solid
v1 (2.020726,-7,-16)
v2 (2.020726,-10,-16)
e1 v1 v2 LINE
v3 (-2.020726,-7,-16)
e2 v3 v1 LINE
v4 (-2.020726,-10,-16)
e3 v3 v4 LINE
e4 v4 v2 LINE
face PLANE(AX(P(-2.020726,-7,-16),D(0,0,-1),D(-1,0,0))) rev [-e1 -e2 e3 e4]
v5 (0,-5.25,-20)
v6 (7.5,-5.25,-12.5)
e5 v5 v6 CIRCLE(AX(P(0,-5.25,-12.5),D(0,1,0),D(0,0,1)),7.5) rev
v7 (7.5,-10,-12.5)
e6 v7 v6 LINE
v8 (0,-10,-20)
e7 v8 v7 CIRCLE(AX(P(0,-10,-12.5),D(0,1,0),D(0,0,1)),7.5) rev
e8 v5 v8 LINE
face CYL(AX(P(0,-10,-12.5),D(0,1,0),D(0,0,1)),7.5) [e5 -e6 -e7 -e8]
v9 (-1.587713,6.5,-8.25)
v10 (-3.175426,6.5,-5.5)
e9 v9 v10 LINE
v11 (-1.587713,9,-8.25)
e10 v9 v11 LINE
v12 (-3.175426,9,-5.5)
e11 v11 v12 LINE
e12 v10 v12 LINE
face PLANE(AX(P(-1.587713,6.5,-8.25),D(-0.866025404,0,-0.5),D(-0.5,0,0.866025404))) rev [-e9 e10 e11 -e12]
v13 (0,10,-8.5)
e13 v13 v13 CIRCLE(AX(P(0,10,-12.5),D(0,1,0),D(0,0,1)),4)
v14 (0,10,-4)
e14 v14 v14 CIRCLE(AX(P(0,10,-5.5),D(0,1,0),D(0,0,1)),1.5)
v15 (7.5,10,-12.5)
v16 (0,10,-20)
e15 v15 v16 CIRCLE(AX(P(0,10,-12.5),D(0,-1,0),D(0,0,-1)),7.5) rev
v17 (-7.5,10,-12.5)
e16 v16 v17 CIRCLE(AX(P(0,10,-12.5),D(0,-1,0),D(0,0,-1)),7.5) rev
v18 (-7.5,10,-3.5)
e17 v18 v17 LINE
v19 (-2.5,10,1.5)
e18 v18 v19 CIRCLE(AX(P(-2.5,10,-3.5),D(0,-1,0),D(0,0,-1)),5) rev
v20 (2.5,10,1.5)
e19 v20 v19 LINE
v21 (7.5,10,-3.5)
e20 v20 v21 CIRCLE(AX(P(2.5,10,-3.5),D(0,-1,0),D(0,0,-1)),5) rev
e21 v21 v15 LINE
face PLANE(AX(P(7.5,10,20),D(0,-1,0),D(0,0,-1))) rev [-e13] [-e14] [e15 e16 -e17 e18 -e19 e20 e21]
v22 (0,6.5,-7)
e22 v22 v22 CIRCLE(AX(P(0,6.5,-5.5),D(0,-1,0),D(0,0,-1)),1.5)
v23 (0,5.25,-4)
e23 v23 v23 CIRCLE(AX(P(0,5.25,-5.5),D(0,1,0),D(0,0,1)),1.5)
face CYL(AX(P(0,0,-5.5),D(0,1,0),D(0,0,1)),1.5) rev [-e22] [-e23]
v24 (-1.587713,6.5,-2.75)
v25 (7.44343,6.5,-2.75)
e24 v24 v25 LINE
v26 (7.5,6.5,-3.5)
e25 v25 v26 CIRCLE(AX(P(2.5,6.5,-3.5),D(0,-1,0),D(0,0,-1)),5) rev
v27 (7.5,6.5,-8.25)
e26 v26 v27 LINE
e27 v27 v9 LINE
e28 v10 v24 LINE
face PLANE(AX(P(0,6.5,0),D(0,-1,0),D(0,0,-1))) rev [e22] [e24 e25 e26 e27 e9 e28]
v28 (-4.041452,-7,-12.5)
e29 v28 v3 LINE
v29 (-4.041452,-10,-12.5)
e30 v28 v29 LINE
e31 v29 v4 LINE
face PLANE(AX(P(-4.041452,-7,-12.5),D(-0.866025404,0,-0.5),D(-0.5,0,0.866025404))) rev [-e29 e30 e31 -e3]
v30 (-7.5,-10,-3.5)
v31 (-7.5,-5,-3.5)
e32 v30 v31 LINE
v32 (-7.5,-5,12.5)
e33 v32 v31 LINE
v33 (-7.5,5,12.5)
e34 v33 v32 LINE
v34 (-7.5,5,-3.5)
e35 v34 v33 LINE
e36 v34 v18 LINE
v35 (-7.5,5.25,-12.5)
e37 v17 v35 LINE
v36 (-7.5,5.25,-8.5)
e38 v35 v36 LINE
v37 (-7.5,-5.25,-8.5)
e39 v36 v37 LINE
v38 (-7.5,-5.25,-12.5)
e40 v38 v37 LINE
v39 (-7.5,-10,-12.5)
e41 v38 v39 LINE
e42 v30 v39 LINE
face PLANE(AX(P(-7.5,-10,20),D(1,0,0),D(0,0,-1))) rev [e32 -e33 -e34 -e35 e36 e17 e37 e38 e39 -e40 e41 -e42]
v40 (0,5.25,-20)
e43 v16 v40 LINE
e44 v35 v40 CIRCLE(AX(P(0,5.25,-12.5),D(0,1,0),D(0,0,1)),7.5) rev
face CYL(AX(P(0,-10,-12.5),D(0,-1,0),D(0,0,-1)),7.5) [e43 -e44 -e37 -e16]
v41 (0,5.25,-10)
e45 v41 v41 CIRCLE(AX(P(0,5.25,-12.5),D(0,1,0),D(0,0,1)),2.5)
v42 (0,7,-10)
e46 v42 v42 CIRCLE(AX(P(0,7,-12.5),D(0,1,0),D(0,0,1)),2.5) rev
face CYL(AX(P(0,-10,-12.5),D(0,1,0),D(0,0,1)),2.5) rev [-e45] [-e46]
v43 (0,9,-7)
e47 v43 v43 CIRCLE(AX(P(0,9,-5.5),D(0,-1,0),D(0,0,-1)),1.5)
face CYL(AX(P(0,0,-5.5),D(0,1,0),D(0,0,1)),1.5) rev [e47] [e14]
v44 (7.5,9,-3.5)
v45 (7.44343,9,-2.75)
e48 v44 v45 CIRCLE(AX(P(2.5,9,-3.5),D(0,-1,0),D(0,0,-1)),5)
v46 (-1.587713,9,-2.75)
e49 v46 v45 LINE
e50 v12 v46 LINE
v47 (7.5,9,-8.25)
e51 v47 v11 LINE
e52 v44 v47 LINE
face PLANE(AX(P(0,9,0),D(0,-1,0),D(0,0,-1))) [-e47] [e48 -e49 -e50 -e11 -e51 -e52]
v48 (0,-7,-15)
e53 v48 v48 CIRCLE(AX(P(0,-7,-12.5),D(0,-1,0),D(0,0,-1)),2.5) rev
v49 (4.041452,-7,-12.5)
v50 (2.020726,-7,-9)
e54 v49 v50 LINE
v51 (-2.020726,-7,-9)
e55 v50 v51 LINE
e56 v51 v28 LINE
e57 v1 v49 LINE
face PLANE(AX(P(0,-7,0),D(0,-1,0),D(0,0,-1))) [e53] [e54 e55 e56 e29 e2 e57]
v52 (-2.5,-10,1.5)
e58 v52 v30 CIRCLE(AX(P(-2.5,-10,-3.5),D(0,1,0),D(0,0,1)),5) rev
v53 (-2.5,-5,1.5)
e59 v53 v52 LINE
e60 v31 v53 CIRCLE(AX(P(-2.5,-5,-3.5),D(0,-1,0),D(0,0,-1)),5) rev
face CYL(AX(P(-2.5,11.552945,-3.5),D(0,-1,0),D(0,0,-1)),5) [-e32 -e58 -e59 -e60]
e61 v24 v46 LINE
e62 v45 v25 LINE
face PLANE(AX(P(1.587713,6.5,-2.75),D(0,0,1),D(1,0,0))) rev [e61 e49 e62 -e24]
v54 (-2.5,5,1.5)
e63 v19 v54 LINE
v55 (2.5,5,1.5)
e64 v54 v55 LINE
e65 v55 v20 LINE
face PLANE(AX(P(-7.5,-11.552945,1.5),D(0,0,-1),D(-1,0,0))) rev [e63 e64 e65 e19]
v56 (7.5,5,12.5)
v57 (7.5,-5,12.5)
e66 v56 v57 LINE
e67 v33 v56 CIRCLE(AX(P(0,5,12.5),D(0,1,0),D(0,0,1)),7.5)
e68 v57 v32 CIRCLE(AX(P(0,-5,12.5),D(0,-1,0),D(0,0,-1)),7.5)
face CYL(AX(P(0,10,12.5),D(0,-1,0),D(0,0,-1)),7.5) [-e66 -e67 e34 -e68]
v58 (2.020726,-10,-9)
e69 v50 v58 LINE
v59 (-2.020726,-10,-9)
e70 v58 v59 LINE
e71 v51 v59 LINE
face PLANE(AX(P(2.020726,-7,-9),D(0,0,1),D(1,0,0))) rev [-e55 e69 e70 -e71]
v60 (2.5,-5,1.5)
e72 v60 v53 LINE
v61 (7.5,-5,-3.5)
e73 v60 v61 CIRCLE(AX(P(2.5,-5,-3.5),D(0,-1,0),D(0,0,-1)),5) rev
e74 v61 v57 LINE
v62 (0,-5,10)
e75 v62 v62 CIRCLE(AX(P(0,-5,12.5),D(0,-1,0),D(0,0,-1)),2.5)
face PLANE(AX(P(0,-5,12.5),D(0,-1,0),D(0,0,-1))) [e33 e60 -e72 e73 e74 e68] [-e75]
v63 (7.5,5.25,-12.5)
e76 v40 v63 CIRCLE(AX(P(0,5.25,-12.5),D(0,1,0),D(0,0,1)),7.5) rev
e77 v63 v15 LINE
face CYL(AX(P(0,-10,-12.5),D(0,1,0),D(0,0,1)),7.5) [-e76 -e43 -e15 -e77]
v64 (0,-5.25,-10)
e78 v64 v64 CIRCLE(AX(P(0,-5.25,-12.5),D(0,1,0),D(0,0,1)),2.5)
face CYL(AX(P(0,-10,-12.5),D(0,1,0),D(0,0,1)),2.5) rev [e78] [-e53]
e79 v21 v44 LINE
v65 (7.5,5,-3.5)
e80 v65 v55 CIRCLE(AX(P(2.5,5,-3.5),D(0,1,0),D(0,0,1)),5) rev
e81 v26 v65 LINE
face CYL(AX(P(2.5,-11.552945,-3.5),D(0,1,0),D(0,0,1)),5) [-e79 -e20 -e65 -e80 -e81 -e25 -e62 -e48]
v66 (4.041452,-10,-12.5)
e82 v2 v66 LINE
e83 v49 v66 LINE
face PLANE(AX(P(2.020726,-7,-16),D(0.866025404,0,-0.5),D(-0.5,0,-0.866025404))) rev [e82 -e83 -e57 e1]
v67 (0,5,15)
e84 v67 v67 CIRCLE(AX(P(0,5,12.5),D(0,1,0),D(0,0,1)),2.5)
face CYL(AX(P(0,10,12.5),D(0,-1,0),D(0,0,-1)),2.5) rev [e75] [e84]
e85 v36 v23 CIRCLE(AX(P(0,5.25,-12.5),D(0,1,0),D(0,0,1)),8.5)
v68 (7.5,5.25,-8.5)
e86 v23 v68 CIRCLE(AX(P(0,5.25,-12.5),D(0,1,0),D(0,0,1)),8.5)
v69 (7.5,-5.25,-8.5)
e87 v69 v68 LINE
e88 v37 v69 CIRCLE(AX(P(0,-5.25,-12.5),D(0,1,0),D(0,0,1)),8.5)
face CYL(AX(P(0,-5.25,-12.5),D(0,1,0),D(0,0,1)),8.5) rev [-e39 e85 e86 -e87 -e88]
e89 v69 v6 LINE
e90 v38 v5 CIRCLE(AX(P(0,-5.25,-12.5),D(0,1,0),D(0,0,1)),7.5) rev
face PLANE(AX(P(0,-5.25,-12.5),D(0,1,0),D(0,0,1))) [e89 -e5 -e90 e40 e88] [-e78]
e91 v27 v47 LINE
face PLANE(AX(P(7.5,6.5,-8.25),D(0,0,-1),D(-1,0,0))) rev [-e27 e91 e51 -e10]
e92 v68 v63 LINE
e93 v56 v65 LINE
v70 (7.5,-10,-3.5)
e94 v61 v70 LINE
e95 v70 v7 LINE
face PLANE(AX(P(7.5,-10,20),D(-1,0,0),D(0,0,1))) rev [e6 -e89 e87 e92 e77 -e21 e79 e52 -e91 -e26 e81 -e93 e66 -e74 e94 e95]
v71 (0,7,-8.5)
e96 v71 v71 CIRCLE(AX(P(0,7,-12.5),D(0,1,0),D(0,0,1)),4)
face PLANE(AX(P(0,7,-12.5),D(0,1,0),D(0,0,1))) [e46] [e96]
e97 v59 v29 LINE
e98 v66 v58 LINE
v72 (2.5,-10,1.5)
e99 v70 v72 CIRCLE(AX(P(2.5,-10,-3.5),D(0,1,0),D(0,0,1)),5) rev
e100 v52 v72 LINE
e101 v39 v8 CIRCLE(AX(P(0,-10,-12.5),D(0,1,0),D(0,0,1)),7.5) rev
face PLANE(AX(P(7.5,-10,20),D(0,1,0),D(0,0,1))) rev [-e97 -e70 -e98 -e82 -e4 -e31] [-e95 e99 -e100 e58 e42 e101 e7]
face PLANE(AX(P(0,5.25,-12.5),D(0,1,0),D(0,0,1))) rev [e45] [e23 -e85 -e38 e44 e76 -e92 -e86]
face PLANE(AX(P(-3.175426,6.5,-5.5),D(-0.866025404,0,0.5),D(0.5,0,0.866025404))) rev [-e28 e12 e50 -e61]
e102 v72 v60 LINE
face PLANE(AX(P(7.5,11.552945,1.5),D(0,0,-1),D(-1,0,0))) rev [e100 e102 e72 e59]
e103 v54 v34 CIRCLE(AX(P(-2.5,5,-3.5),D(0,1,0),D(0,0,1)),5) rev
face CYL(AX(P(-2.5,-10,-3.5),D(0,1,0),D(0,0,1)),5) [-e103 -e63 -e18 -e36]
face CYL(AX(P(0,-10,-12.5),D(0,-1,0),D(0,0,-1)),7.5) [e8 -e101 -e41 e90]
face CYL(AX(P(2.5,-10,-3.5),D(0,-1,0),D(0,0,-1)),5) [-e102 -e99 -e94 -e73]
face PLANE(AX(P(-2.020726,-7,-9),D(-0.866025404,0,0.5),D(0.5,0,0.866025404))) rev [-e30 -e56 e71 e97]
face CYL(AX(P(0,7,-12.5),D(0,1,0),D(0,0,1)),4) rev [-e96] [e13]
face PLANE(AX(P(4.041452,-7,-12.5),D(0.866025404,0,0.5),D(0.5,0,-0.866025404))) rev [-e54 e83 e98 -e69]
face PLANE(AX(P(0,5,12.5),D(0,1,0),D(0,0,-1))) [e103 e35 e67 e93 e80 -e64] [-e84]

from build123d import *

# Parameters (mm, degrees)
SKETCH1_W           = 15
SKETCH1_H           = 20
BOSS_EXTRUDE1_DEPTH = 20
FILLET1_R           = 7.5
CUT_EXTRUDE1_START  = -4.75
SKETCH3_R           = 8.5
CUT_EXTRUDE1_DEPTH  = 10.5
SKETCH4_R           = 2.5
CUT_EXTRUDE2_DEPTH  = 30.261749777
CUT_EXTRUDE3_DEPTH  = 3
SKETCH6_R           = 4
CUT_EXTRUDE4_DEPTH  = 3
CUT_EXTRUDE5_DEPTH  = 30.261749777
SKETCH8_R           = 8.5
CUT_EXTRUDE6_DEPTH  = 5
SKETCH9_R           = 2.5
CUT_EXTRUDE7_DEPTH  = 27.100766272
CUT_EXTRUDE8_START  = -1
CUT_EXTRUDE8_DEPTH  = 2.5
SKETCH11_R          = 1.5
CUT_EXTRUDE9_DEPTH  = 10
SKETCH12_W          = 15
SKETCH12_H          = 7
CUT_EXTRUDE10_DEPTH = 5
SKETCH13_W          = 15
SKETCH13_H          = 7
CUT_EXTRUDE11_DEPTH = 5
FILLET2_R           = 5


# Some blends are built 0.0001 mm under size
with BuildPart() as part:
    # Sketch1 → Boss-Extrude1 (new, symmetric)
    with BuildSketch(Plane.XY):
        Rectangle(SKETCH1_W, SKETCH1_H)
    extrude(amount=BOSS_EXTRUDE1_DEPTH, both=True)

    # Fillet1
    fillet1_edges = [part.edges().sort_by_distance(p)[0] for p in [
        (-7.5, 0, -20),
        (7.5, 0, -20),
    ]]
    fillet(fillet1_edges, radius=FILLET1_R - 0.0001)  # a hair under: the kernel refuses the full size

    # Sketch3 → Cut-Extrude1 (cut)
    with BuildSketch(Plane(origin=(0, 10, 0), x_dir=(1, 0, 0), z_dir=(0, 1, 0)).offset(CUT_EXTRUDE1_START)):
        with Locations((0, 12.5)):
            Circle(SKETCH3_R)
    extrude(amount=-CUT_EXTRUDE1_DEPTH, mode=Mode.SUBTRACT)

    # Sketch4 → Cut-Extrude2 (cut, through all)
    with BuildSketch(Plane(origin=(0, 10, 0), x_dir=(1, 0, 0), z_dir=(0, 1, 0))):
        with Locations(Location((0, 12.5, 0), (0, 0, 270))):
            Circle(SKETCH4_R)
    extrude(amount=-CUT_EXTRUDE2_DEPTH, mode=Mode.SUBTRACT)

    # Sketch5 → Cut-Extrude3 (cut)
    with BuildSketch(Plane(origin=(0, -10, 0), x_dir=(-1, 0, 0), z_dir=(0, -1, 0))):
        Polygon((-2.020725942, 16), (-4.041451884, 12.5), (-2.020725942, 9), (2.020725942, 9), (4.041451884, 12.5), (2.020725942, 16), align=None)
    extrude(amount=-CUT_EXTRUDE3_DEPTH, mode=Mode.SUBTRACT)

    # Sketch6 → Cut-Extrude4 (cut)
    with BuildSketch(Plane(origin=(0, 10, 0), x_dir=(1, 0, 0), z_dir=(0, 1, 0))):
        with Locations(Location((0, 12.5, 0), (0, 0, 270))):
            Circle(SKETCH6_R)
    extrude(amount=-CUT_EXTRUDE4_DEPTH, mode=Mode.SUBTRACT)

    # Sketch7 → Cut-Extrude5 (cut, through all)
    with BuildSketch(Plane.XZ.offset(10)):
        with BuildLine():
            Line((-7.5, 12.5), (-7.5, 22.5))
            Line((-7.5, 22.5), (7.5, 22.5))
            Line((7.5, 22.5), (7.5, 12.5))
            ThreePointArc((7.5, 12.5), (0, 20), (-7.5, 12.5))
        make_face()
    extrude(amount=-CUT_EXTRUDE5_DEPTH, mode=Mode.SUBTRACT)

    # Sketch8 → Cut-Extrude6 (cut)
    with BuildSketch(Plane.XZ.offset(10)):
        with Locations((0, 12.5)):
            Circle(SKETCH8_R)
    cut_extrude6 = extrude(amount=-CUT_EXTRUDE6_DEPTH, mode=Mode.SUBTRACT)

    # Mirror3: Cut-Extrude6 across plane
    add(cut_extrude6.mirror(Plane.ZX), mode=Mode.SUBTRACT)

    # Sketch9 → Cut-Extrude7 (cut, through all)
    with BuildSketch(Plane.XZ.offset(5)):
        with Locations(Location((0, 12.5, 0), (0, 0, 270))):
            Circle(SKETCH9_R)
    extrude(amount=-CUT_EXTRUDE7_DEPTH, mode=Mode.SUBTRACT)

    # Sketch10 → Cut-Extrude8 (cut)
    with BuildSketch(Plane(origin=(0, 10, 0), x_dir=(1, 0, 0), z_dir=(0, 1, 0)).offset(CUT_EXTRUDE8_START)):
        Polygon((1.58771324, 2.75), (7.5, 2.75), (7.5, 8.25), (1.58771324, 8.25), (-1.58771324, 8.25), (-3.175426481, 5.5), (-1.58771324, 2.75), align=None)
    extrude(amount=-CUT_EXTRUDE8_DEPTH, mode=Mode.SUBTRACT)

    # Sketch11 → Cut-Extrude9 (cut)
    with BuildSketch(Plane(origin=(0, 10, 0), x_dir=(1, 0, 0), z_dir=(0, 1, 0))):
        with Locations(Location((0, 5.5, 0), (0, 0, 270))):
            Circle(SKETCH11_R)
    extrude(amount=-CUT_EXTRUDE9_DEPTH, mode=Mode.SUBTRACT)

    # Sketch12 → Cut-Extrude10 (cut)
    with BuildSketch(Plane(origin=(0, 10, 0), x_dir=(1, 0, 0), z_dir=(0, 1, 0))):
        with Locations((0, -5)):
            Rectangle(SKETCH12_W, SKETCH12_H)
    extrude(amount=-CUT_EXTRUDE10_DEPTH, mode=Mode.SUBTRACT)

    # Sketch13 → Cut-Extrude11 (cut)
    with BuildSketch(Plane.XZ.offset(10)):
        with Locations((0, 5)):
            Rectangle(SKETCH13_W, SKETCH13_H)
    extrude(amount=-CUT_EXTRUDE11_DEPTH, mode=Mode.SUBTRACT)

    # Fillet2
    # the kernel refuses this fillet: 5 mm, written as the material it takes off along each edge
    with BuildSketch(Plane(origin=(-7.5, 22.5, 1.5), x_dir=(1, 0, 0), z_dir=(0, -1, 0)), Plane(origin=(7.5, -22.5, 1.5), x_dir=(-1, 0, 0), z_dir=(0, 1, 0)), Plane(origin=(-7.5, -22.5, 1.5), x_dir=(0, 0, -1), z_dir=(0, 1, 0))) as fillet2_piece_1:
        with BuildLine():
            CenterArc((FILLET2_R, -FILLET2_R), FILLET2_R, 90, 90)
            Line((0, -FILLET2_R), (0, 0))
            Line((0, 0), (FILLET2_R, 0))
        make_face()
    extrude(amount=17.5, mode=Mode.SUBTRACT)
    with BuildSketch(Plane(origin=(-7.5, 22.5, 1.5), x_dir=(1, 0, 0), z_dir=(0, -1, 0))) as fillet2_piece_2_section:
        with BuildLine():
            CenterArc((FILLET2_R, -FILLET2_R), FILLET2_R, 90, 90)
            Line((0, -FILLET2_R), (0, 0))
            Line((0, 0), (FILLET2_R, 0))
        make_face()
    fillet2_piece_2 = extrude(amount=30, mode=Mode.PRIVATE)
    fillet2_piece_2 = split(fillet2_piece_2, bisect_by=Plane(origin=(-6.368024429, -5, 0.368024429), z_dir=(0, -1, 0)), keep=Keep.TOP, mode=Mode.PRIVATE)
    add(fillet2_piece_2, mode=Mode.SUBTRACT)
    with BuildSketch(Plane(origin=(7.5, 22.5, 1.5), x_dir=(-1, 0, 0), z_dir=(0, -1, 0))) as fillet2_piece_3:
        with BuildLine():
            CenterArc((FILLET2_R, FILLET2_R), FILLET2_R, 180, 90)
            Line((0, FILLET2_R), (0, 0))
            Line((0, 0), (FILLET2_R, 0))
        make_face()
    extrude(amount=17.5, mode=Mode.SUBTRACT)
    with BuildSketch(Plane(origin=(7.5, 22.5, 1.5), x_dir=(-1, 0, 0), z_dir=(0, -1, 0))) as fillet2_piece_4_section:
        with BuildLine():
            CenterArc((FILLET2_R, FILLET2_R), FILLET2_R, 180, 90)
            Line((0, FILLET2_R), (0, 0))
            Line((0, 0), (FILLET2_R, 0))
        make_face()
    fillet2_piece_4 = extrude(amount=30, mode=Mode.PRIVATE)
    fillet2_piece_4 = split(fillet2_piece_4, bisect_by=Plane(origin=(6.368024429, -5, 0.368024429), z_dir=(0, -1, 0)), keep=Keep.TOP, mode=Mode.PRIVATE)
    add(fillet2_piece_4, mode=Mode.SUBTRACT)
    with BuildSketch(Plane(origin=(7.5, -22.5, 1.5), x_dir=(-1, 0, 0), z_dir=(0, 1, 0))) as fillet2_piece_5_section:
        with BuildLine():
            CenterArc((FILLET2_R, -FILLET2_R), FILLET2_R, 90, 90)
            Line((0, -FILLET2_R), (0, 0))
            Line((0, 0), (FILLET2_R, 0))
        make_face()
    fillet2_piece_5 = extrude(amount=30, mode=Mode.PRIVATE)
    fillet2_piece_5 = split(fillet2_piece_5, bisect_by=Plane(origin=(6.368024429, 5, 0.368024429), z_dir=(0, 1, 0)), keep=Keep.TOP, mode=Mode.PRIVATE)
    add(fillet2_piece_5, mode=Mode.SUBTRACT)
    with BuildSketch(Plane(origin=(-7.5, -22.5, 1.5), x_dir=(0, 0, -1), z_dir=(0, 1, 0))) as fillet2_piece_6_section:
        with BuildLine():
            CenterArc((FILLET2_R, -FILLET2_R), FILLET2_R, 90, 90)
            Line((0, -FILLET2_R), (0, 0))
            Line((0, 0), (FILLET2_R, 0))
        make_face()
    fillet2_piece_6 = extrude(amount=30, mode=Mode.PRIVATE)
    fillet2_piece_6 = split(fillet2_piece_6, bisect_by=Plane(origin=(-6.368024429, 5, 0.368024429), z_dir=(0, 1, 0)), keep=Keep.TOP, mode=Mode.PRIVATE)
    add(fillet2_piece_6, mode=Mode.SUBTRACT)


solid = part.part
